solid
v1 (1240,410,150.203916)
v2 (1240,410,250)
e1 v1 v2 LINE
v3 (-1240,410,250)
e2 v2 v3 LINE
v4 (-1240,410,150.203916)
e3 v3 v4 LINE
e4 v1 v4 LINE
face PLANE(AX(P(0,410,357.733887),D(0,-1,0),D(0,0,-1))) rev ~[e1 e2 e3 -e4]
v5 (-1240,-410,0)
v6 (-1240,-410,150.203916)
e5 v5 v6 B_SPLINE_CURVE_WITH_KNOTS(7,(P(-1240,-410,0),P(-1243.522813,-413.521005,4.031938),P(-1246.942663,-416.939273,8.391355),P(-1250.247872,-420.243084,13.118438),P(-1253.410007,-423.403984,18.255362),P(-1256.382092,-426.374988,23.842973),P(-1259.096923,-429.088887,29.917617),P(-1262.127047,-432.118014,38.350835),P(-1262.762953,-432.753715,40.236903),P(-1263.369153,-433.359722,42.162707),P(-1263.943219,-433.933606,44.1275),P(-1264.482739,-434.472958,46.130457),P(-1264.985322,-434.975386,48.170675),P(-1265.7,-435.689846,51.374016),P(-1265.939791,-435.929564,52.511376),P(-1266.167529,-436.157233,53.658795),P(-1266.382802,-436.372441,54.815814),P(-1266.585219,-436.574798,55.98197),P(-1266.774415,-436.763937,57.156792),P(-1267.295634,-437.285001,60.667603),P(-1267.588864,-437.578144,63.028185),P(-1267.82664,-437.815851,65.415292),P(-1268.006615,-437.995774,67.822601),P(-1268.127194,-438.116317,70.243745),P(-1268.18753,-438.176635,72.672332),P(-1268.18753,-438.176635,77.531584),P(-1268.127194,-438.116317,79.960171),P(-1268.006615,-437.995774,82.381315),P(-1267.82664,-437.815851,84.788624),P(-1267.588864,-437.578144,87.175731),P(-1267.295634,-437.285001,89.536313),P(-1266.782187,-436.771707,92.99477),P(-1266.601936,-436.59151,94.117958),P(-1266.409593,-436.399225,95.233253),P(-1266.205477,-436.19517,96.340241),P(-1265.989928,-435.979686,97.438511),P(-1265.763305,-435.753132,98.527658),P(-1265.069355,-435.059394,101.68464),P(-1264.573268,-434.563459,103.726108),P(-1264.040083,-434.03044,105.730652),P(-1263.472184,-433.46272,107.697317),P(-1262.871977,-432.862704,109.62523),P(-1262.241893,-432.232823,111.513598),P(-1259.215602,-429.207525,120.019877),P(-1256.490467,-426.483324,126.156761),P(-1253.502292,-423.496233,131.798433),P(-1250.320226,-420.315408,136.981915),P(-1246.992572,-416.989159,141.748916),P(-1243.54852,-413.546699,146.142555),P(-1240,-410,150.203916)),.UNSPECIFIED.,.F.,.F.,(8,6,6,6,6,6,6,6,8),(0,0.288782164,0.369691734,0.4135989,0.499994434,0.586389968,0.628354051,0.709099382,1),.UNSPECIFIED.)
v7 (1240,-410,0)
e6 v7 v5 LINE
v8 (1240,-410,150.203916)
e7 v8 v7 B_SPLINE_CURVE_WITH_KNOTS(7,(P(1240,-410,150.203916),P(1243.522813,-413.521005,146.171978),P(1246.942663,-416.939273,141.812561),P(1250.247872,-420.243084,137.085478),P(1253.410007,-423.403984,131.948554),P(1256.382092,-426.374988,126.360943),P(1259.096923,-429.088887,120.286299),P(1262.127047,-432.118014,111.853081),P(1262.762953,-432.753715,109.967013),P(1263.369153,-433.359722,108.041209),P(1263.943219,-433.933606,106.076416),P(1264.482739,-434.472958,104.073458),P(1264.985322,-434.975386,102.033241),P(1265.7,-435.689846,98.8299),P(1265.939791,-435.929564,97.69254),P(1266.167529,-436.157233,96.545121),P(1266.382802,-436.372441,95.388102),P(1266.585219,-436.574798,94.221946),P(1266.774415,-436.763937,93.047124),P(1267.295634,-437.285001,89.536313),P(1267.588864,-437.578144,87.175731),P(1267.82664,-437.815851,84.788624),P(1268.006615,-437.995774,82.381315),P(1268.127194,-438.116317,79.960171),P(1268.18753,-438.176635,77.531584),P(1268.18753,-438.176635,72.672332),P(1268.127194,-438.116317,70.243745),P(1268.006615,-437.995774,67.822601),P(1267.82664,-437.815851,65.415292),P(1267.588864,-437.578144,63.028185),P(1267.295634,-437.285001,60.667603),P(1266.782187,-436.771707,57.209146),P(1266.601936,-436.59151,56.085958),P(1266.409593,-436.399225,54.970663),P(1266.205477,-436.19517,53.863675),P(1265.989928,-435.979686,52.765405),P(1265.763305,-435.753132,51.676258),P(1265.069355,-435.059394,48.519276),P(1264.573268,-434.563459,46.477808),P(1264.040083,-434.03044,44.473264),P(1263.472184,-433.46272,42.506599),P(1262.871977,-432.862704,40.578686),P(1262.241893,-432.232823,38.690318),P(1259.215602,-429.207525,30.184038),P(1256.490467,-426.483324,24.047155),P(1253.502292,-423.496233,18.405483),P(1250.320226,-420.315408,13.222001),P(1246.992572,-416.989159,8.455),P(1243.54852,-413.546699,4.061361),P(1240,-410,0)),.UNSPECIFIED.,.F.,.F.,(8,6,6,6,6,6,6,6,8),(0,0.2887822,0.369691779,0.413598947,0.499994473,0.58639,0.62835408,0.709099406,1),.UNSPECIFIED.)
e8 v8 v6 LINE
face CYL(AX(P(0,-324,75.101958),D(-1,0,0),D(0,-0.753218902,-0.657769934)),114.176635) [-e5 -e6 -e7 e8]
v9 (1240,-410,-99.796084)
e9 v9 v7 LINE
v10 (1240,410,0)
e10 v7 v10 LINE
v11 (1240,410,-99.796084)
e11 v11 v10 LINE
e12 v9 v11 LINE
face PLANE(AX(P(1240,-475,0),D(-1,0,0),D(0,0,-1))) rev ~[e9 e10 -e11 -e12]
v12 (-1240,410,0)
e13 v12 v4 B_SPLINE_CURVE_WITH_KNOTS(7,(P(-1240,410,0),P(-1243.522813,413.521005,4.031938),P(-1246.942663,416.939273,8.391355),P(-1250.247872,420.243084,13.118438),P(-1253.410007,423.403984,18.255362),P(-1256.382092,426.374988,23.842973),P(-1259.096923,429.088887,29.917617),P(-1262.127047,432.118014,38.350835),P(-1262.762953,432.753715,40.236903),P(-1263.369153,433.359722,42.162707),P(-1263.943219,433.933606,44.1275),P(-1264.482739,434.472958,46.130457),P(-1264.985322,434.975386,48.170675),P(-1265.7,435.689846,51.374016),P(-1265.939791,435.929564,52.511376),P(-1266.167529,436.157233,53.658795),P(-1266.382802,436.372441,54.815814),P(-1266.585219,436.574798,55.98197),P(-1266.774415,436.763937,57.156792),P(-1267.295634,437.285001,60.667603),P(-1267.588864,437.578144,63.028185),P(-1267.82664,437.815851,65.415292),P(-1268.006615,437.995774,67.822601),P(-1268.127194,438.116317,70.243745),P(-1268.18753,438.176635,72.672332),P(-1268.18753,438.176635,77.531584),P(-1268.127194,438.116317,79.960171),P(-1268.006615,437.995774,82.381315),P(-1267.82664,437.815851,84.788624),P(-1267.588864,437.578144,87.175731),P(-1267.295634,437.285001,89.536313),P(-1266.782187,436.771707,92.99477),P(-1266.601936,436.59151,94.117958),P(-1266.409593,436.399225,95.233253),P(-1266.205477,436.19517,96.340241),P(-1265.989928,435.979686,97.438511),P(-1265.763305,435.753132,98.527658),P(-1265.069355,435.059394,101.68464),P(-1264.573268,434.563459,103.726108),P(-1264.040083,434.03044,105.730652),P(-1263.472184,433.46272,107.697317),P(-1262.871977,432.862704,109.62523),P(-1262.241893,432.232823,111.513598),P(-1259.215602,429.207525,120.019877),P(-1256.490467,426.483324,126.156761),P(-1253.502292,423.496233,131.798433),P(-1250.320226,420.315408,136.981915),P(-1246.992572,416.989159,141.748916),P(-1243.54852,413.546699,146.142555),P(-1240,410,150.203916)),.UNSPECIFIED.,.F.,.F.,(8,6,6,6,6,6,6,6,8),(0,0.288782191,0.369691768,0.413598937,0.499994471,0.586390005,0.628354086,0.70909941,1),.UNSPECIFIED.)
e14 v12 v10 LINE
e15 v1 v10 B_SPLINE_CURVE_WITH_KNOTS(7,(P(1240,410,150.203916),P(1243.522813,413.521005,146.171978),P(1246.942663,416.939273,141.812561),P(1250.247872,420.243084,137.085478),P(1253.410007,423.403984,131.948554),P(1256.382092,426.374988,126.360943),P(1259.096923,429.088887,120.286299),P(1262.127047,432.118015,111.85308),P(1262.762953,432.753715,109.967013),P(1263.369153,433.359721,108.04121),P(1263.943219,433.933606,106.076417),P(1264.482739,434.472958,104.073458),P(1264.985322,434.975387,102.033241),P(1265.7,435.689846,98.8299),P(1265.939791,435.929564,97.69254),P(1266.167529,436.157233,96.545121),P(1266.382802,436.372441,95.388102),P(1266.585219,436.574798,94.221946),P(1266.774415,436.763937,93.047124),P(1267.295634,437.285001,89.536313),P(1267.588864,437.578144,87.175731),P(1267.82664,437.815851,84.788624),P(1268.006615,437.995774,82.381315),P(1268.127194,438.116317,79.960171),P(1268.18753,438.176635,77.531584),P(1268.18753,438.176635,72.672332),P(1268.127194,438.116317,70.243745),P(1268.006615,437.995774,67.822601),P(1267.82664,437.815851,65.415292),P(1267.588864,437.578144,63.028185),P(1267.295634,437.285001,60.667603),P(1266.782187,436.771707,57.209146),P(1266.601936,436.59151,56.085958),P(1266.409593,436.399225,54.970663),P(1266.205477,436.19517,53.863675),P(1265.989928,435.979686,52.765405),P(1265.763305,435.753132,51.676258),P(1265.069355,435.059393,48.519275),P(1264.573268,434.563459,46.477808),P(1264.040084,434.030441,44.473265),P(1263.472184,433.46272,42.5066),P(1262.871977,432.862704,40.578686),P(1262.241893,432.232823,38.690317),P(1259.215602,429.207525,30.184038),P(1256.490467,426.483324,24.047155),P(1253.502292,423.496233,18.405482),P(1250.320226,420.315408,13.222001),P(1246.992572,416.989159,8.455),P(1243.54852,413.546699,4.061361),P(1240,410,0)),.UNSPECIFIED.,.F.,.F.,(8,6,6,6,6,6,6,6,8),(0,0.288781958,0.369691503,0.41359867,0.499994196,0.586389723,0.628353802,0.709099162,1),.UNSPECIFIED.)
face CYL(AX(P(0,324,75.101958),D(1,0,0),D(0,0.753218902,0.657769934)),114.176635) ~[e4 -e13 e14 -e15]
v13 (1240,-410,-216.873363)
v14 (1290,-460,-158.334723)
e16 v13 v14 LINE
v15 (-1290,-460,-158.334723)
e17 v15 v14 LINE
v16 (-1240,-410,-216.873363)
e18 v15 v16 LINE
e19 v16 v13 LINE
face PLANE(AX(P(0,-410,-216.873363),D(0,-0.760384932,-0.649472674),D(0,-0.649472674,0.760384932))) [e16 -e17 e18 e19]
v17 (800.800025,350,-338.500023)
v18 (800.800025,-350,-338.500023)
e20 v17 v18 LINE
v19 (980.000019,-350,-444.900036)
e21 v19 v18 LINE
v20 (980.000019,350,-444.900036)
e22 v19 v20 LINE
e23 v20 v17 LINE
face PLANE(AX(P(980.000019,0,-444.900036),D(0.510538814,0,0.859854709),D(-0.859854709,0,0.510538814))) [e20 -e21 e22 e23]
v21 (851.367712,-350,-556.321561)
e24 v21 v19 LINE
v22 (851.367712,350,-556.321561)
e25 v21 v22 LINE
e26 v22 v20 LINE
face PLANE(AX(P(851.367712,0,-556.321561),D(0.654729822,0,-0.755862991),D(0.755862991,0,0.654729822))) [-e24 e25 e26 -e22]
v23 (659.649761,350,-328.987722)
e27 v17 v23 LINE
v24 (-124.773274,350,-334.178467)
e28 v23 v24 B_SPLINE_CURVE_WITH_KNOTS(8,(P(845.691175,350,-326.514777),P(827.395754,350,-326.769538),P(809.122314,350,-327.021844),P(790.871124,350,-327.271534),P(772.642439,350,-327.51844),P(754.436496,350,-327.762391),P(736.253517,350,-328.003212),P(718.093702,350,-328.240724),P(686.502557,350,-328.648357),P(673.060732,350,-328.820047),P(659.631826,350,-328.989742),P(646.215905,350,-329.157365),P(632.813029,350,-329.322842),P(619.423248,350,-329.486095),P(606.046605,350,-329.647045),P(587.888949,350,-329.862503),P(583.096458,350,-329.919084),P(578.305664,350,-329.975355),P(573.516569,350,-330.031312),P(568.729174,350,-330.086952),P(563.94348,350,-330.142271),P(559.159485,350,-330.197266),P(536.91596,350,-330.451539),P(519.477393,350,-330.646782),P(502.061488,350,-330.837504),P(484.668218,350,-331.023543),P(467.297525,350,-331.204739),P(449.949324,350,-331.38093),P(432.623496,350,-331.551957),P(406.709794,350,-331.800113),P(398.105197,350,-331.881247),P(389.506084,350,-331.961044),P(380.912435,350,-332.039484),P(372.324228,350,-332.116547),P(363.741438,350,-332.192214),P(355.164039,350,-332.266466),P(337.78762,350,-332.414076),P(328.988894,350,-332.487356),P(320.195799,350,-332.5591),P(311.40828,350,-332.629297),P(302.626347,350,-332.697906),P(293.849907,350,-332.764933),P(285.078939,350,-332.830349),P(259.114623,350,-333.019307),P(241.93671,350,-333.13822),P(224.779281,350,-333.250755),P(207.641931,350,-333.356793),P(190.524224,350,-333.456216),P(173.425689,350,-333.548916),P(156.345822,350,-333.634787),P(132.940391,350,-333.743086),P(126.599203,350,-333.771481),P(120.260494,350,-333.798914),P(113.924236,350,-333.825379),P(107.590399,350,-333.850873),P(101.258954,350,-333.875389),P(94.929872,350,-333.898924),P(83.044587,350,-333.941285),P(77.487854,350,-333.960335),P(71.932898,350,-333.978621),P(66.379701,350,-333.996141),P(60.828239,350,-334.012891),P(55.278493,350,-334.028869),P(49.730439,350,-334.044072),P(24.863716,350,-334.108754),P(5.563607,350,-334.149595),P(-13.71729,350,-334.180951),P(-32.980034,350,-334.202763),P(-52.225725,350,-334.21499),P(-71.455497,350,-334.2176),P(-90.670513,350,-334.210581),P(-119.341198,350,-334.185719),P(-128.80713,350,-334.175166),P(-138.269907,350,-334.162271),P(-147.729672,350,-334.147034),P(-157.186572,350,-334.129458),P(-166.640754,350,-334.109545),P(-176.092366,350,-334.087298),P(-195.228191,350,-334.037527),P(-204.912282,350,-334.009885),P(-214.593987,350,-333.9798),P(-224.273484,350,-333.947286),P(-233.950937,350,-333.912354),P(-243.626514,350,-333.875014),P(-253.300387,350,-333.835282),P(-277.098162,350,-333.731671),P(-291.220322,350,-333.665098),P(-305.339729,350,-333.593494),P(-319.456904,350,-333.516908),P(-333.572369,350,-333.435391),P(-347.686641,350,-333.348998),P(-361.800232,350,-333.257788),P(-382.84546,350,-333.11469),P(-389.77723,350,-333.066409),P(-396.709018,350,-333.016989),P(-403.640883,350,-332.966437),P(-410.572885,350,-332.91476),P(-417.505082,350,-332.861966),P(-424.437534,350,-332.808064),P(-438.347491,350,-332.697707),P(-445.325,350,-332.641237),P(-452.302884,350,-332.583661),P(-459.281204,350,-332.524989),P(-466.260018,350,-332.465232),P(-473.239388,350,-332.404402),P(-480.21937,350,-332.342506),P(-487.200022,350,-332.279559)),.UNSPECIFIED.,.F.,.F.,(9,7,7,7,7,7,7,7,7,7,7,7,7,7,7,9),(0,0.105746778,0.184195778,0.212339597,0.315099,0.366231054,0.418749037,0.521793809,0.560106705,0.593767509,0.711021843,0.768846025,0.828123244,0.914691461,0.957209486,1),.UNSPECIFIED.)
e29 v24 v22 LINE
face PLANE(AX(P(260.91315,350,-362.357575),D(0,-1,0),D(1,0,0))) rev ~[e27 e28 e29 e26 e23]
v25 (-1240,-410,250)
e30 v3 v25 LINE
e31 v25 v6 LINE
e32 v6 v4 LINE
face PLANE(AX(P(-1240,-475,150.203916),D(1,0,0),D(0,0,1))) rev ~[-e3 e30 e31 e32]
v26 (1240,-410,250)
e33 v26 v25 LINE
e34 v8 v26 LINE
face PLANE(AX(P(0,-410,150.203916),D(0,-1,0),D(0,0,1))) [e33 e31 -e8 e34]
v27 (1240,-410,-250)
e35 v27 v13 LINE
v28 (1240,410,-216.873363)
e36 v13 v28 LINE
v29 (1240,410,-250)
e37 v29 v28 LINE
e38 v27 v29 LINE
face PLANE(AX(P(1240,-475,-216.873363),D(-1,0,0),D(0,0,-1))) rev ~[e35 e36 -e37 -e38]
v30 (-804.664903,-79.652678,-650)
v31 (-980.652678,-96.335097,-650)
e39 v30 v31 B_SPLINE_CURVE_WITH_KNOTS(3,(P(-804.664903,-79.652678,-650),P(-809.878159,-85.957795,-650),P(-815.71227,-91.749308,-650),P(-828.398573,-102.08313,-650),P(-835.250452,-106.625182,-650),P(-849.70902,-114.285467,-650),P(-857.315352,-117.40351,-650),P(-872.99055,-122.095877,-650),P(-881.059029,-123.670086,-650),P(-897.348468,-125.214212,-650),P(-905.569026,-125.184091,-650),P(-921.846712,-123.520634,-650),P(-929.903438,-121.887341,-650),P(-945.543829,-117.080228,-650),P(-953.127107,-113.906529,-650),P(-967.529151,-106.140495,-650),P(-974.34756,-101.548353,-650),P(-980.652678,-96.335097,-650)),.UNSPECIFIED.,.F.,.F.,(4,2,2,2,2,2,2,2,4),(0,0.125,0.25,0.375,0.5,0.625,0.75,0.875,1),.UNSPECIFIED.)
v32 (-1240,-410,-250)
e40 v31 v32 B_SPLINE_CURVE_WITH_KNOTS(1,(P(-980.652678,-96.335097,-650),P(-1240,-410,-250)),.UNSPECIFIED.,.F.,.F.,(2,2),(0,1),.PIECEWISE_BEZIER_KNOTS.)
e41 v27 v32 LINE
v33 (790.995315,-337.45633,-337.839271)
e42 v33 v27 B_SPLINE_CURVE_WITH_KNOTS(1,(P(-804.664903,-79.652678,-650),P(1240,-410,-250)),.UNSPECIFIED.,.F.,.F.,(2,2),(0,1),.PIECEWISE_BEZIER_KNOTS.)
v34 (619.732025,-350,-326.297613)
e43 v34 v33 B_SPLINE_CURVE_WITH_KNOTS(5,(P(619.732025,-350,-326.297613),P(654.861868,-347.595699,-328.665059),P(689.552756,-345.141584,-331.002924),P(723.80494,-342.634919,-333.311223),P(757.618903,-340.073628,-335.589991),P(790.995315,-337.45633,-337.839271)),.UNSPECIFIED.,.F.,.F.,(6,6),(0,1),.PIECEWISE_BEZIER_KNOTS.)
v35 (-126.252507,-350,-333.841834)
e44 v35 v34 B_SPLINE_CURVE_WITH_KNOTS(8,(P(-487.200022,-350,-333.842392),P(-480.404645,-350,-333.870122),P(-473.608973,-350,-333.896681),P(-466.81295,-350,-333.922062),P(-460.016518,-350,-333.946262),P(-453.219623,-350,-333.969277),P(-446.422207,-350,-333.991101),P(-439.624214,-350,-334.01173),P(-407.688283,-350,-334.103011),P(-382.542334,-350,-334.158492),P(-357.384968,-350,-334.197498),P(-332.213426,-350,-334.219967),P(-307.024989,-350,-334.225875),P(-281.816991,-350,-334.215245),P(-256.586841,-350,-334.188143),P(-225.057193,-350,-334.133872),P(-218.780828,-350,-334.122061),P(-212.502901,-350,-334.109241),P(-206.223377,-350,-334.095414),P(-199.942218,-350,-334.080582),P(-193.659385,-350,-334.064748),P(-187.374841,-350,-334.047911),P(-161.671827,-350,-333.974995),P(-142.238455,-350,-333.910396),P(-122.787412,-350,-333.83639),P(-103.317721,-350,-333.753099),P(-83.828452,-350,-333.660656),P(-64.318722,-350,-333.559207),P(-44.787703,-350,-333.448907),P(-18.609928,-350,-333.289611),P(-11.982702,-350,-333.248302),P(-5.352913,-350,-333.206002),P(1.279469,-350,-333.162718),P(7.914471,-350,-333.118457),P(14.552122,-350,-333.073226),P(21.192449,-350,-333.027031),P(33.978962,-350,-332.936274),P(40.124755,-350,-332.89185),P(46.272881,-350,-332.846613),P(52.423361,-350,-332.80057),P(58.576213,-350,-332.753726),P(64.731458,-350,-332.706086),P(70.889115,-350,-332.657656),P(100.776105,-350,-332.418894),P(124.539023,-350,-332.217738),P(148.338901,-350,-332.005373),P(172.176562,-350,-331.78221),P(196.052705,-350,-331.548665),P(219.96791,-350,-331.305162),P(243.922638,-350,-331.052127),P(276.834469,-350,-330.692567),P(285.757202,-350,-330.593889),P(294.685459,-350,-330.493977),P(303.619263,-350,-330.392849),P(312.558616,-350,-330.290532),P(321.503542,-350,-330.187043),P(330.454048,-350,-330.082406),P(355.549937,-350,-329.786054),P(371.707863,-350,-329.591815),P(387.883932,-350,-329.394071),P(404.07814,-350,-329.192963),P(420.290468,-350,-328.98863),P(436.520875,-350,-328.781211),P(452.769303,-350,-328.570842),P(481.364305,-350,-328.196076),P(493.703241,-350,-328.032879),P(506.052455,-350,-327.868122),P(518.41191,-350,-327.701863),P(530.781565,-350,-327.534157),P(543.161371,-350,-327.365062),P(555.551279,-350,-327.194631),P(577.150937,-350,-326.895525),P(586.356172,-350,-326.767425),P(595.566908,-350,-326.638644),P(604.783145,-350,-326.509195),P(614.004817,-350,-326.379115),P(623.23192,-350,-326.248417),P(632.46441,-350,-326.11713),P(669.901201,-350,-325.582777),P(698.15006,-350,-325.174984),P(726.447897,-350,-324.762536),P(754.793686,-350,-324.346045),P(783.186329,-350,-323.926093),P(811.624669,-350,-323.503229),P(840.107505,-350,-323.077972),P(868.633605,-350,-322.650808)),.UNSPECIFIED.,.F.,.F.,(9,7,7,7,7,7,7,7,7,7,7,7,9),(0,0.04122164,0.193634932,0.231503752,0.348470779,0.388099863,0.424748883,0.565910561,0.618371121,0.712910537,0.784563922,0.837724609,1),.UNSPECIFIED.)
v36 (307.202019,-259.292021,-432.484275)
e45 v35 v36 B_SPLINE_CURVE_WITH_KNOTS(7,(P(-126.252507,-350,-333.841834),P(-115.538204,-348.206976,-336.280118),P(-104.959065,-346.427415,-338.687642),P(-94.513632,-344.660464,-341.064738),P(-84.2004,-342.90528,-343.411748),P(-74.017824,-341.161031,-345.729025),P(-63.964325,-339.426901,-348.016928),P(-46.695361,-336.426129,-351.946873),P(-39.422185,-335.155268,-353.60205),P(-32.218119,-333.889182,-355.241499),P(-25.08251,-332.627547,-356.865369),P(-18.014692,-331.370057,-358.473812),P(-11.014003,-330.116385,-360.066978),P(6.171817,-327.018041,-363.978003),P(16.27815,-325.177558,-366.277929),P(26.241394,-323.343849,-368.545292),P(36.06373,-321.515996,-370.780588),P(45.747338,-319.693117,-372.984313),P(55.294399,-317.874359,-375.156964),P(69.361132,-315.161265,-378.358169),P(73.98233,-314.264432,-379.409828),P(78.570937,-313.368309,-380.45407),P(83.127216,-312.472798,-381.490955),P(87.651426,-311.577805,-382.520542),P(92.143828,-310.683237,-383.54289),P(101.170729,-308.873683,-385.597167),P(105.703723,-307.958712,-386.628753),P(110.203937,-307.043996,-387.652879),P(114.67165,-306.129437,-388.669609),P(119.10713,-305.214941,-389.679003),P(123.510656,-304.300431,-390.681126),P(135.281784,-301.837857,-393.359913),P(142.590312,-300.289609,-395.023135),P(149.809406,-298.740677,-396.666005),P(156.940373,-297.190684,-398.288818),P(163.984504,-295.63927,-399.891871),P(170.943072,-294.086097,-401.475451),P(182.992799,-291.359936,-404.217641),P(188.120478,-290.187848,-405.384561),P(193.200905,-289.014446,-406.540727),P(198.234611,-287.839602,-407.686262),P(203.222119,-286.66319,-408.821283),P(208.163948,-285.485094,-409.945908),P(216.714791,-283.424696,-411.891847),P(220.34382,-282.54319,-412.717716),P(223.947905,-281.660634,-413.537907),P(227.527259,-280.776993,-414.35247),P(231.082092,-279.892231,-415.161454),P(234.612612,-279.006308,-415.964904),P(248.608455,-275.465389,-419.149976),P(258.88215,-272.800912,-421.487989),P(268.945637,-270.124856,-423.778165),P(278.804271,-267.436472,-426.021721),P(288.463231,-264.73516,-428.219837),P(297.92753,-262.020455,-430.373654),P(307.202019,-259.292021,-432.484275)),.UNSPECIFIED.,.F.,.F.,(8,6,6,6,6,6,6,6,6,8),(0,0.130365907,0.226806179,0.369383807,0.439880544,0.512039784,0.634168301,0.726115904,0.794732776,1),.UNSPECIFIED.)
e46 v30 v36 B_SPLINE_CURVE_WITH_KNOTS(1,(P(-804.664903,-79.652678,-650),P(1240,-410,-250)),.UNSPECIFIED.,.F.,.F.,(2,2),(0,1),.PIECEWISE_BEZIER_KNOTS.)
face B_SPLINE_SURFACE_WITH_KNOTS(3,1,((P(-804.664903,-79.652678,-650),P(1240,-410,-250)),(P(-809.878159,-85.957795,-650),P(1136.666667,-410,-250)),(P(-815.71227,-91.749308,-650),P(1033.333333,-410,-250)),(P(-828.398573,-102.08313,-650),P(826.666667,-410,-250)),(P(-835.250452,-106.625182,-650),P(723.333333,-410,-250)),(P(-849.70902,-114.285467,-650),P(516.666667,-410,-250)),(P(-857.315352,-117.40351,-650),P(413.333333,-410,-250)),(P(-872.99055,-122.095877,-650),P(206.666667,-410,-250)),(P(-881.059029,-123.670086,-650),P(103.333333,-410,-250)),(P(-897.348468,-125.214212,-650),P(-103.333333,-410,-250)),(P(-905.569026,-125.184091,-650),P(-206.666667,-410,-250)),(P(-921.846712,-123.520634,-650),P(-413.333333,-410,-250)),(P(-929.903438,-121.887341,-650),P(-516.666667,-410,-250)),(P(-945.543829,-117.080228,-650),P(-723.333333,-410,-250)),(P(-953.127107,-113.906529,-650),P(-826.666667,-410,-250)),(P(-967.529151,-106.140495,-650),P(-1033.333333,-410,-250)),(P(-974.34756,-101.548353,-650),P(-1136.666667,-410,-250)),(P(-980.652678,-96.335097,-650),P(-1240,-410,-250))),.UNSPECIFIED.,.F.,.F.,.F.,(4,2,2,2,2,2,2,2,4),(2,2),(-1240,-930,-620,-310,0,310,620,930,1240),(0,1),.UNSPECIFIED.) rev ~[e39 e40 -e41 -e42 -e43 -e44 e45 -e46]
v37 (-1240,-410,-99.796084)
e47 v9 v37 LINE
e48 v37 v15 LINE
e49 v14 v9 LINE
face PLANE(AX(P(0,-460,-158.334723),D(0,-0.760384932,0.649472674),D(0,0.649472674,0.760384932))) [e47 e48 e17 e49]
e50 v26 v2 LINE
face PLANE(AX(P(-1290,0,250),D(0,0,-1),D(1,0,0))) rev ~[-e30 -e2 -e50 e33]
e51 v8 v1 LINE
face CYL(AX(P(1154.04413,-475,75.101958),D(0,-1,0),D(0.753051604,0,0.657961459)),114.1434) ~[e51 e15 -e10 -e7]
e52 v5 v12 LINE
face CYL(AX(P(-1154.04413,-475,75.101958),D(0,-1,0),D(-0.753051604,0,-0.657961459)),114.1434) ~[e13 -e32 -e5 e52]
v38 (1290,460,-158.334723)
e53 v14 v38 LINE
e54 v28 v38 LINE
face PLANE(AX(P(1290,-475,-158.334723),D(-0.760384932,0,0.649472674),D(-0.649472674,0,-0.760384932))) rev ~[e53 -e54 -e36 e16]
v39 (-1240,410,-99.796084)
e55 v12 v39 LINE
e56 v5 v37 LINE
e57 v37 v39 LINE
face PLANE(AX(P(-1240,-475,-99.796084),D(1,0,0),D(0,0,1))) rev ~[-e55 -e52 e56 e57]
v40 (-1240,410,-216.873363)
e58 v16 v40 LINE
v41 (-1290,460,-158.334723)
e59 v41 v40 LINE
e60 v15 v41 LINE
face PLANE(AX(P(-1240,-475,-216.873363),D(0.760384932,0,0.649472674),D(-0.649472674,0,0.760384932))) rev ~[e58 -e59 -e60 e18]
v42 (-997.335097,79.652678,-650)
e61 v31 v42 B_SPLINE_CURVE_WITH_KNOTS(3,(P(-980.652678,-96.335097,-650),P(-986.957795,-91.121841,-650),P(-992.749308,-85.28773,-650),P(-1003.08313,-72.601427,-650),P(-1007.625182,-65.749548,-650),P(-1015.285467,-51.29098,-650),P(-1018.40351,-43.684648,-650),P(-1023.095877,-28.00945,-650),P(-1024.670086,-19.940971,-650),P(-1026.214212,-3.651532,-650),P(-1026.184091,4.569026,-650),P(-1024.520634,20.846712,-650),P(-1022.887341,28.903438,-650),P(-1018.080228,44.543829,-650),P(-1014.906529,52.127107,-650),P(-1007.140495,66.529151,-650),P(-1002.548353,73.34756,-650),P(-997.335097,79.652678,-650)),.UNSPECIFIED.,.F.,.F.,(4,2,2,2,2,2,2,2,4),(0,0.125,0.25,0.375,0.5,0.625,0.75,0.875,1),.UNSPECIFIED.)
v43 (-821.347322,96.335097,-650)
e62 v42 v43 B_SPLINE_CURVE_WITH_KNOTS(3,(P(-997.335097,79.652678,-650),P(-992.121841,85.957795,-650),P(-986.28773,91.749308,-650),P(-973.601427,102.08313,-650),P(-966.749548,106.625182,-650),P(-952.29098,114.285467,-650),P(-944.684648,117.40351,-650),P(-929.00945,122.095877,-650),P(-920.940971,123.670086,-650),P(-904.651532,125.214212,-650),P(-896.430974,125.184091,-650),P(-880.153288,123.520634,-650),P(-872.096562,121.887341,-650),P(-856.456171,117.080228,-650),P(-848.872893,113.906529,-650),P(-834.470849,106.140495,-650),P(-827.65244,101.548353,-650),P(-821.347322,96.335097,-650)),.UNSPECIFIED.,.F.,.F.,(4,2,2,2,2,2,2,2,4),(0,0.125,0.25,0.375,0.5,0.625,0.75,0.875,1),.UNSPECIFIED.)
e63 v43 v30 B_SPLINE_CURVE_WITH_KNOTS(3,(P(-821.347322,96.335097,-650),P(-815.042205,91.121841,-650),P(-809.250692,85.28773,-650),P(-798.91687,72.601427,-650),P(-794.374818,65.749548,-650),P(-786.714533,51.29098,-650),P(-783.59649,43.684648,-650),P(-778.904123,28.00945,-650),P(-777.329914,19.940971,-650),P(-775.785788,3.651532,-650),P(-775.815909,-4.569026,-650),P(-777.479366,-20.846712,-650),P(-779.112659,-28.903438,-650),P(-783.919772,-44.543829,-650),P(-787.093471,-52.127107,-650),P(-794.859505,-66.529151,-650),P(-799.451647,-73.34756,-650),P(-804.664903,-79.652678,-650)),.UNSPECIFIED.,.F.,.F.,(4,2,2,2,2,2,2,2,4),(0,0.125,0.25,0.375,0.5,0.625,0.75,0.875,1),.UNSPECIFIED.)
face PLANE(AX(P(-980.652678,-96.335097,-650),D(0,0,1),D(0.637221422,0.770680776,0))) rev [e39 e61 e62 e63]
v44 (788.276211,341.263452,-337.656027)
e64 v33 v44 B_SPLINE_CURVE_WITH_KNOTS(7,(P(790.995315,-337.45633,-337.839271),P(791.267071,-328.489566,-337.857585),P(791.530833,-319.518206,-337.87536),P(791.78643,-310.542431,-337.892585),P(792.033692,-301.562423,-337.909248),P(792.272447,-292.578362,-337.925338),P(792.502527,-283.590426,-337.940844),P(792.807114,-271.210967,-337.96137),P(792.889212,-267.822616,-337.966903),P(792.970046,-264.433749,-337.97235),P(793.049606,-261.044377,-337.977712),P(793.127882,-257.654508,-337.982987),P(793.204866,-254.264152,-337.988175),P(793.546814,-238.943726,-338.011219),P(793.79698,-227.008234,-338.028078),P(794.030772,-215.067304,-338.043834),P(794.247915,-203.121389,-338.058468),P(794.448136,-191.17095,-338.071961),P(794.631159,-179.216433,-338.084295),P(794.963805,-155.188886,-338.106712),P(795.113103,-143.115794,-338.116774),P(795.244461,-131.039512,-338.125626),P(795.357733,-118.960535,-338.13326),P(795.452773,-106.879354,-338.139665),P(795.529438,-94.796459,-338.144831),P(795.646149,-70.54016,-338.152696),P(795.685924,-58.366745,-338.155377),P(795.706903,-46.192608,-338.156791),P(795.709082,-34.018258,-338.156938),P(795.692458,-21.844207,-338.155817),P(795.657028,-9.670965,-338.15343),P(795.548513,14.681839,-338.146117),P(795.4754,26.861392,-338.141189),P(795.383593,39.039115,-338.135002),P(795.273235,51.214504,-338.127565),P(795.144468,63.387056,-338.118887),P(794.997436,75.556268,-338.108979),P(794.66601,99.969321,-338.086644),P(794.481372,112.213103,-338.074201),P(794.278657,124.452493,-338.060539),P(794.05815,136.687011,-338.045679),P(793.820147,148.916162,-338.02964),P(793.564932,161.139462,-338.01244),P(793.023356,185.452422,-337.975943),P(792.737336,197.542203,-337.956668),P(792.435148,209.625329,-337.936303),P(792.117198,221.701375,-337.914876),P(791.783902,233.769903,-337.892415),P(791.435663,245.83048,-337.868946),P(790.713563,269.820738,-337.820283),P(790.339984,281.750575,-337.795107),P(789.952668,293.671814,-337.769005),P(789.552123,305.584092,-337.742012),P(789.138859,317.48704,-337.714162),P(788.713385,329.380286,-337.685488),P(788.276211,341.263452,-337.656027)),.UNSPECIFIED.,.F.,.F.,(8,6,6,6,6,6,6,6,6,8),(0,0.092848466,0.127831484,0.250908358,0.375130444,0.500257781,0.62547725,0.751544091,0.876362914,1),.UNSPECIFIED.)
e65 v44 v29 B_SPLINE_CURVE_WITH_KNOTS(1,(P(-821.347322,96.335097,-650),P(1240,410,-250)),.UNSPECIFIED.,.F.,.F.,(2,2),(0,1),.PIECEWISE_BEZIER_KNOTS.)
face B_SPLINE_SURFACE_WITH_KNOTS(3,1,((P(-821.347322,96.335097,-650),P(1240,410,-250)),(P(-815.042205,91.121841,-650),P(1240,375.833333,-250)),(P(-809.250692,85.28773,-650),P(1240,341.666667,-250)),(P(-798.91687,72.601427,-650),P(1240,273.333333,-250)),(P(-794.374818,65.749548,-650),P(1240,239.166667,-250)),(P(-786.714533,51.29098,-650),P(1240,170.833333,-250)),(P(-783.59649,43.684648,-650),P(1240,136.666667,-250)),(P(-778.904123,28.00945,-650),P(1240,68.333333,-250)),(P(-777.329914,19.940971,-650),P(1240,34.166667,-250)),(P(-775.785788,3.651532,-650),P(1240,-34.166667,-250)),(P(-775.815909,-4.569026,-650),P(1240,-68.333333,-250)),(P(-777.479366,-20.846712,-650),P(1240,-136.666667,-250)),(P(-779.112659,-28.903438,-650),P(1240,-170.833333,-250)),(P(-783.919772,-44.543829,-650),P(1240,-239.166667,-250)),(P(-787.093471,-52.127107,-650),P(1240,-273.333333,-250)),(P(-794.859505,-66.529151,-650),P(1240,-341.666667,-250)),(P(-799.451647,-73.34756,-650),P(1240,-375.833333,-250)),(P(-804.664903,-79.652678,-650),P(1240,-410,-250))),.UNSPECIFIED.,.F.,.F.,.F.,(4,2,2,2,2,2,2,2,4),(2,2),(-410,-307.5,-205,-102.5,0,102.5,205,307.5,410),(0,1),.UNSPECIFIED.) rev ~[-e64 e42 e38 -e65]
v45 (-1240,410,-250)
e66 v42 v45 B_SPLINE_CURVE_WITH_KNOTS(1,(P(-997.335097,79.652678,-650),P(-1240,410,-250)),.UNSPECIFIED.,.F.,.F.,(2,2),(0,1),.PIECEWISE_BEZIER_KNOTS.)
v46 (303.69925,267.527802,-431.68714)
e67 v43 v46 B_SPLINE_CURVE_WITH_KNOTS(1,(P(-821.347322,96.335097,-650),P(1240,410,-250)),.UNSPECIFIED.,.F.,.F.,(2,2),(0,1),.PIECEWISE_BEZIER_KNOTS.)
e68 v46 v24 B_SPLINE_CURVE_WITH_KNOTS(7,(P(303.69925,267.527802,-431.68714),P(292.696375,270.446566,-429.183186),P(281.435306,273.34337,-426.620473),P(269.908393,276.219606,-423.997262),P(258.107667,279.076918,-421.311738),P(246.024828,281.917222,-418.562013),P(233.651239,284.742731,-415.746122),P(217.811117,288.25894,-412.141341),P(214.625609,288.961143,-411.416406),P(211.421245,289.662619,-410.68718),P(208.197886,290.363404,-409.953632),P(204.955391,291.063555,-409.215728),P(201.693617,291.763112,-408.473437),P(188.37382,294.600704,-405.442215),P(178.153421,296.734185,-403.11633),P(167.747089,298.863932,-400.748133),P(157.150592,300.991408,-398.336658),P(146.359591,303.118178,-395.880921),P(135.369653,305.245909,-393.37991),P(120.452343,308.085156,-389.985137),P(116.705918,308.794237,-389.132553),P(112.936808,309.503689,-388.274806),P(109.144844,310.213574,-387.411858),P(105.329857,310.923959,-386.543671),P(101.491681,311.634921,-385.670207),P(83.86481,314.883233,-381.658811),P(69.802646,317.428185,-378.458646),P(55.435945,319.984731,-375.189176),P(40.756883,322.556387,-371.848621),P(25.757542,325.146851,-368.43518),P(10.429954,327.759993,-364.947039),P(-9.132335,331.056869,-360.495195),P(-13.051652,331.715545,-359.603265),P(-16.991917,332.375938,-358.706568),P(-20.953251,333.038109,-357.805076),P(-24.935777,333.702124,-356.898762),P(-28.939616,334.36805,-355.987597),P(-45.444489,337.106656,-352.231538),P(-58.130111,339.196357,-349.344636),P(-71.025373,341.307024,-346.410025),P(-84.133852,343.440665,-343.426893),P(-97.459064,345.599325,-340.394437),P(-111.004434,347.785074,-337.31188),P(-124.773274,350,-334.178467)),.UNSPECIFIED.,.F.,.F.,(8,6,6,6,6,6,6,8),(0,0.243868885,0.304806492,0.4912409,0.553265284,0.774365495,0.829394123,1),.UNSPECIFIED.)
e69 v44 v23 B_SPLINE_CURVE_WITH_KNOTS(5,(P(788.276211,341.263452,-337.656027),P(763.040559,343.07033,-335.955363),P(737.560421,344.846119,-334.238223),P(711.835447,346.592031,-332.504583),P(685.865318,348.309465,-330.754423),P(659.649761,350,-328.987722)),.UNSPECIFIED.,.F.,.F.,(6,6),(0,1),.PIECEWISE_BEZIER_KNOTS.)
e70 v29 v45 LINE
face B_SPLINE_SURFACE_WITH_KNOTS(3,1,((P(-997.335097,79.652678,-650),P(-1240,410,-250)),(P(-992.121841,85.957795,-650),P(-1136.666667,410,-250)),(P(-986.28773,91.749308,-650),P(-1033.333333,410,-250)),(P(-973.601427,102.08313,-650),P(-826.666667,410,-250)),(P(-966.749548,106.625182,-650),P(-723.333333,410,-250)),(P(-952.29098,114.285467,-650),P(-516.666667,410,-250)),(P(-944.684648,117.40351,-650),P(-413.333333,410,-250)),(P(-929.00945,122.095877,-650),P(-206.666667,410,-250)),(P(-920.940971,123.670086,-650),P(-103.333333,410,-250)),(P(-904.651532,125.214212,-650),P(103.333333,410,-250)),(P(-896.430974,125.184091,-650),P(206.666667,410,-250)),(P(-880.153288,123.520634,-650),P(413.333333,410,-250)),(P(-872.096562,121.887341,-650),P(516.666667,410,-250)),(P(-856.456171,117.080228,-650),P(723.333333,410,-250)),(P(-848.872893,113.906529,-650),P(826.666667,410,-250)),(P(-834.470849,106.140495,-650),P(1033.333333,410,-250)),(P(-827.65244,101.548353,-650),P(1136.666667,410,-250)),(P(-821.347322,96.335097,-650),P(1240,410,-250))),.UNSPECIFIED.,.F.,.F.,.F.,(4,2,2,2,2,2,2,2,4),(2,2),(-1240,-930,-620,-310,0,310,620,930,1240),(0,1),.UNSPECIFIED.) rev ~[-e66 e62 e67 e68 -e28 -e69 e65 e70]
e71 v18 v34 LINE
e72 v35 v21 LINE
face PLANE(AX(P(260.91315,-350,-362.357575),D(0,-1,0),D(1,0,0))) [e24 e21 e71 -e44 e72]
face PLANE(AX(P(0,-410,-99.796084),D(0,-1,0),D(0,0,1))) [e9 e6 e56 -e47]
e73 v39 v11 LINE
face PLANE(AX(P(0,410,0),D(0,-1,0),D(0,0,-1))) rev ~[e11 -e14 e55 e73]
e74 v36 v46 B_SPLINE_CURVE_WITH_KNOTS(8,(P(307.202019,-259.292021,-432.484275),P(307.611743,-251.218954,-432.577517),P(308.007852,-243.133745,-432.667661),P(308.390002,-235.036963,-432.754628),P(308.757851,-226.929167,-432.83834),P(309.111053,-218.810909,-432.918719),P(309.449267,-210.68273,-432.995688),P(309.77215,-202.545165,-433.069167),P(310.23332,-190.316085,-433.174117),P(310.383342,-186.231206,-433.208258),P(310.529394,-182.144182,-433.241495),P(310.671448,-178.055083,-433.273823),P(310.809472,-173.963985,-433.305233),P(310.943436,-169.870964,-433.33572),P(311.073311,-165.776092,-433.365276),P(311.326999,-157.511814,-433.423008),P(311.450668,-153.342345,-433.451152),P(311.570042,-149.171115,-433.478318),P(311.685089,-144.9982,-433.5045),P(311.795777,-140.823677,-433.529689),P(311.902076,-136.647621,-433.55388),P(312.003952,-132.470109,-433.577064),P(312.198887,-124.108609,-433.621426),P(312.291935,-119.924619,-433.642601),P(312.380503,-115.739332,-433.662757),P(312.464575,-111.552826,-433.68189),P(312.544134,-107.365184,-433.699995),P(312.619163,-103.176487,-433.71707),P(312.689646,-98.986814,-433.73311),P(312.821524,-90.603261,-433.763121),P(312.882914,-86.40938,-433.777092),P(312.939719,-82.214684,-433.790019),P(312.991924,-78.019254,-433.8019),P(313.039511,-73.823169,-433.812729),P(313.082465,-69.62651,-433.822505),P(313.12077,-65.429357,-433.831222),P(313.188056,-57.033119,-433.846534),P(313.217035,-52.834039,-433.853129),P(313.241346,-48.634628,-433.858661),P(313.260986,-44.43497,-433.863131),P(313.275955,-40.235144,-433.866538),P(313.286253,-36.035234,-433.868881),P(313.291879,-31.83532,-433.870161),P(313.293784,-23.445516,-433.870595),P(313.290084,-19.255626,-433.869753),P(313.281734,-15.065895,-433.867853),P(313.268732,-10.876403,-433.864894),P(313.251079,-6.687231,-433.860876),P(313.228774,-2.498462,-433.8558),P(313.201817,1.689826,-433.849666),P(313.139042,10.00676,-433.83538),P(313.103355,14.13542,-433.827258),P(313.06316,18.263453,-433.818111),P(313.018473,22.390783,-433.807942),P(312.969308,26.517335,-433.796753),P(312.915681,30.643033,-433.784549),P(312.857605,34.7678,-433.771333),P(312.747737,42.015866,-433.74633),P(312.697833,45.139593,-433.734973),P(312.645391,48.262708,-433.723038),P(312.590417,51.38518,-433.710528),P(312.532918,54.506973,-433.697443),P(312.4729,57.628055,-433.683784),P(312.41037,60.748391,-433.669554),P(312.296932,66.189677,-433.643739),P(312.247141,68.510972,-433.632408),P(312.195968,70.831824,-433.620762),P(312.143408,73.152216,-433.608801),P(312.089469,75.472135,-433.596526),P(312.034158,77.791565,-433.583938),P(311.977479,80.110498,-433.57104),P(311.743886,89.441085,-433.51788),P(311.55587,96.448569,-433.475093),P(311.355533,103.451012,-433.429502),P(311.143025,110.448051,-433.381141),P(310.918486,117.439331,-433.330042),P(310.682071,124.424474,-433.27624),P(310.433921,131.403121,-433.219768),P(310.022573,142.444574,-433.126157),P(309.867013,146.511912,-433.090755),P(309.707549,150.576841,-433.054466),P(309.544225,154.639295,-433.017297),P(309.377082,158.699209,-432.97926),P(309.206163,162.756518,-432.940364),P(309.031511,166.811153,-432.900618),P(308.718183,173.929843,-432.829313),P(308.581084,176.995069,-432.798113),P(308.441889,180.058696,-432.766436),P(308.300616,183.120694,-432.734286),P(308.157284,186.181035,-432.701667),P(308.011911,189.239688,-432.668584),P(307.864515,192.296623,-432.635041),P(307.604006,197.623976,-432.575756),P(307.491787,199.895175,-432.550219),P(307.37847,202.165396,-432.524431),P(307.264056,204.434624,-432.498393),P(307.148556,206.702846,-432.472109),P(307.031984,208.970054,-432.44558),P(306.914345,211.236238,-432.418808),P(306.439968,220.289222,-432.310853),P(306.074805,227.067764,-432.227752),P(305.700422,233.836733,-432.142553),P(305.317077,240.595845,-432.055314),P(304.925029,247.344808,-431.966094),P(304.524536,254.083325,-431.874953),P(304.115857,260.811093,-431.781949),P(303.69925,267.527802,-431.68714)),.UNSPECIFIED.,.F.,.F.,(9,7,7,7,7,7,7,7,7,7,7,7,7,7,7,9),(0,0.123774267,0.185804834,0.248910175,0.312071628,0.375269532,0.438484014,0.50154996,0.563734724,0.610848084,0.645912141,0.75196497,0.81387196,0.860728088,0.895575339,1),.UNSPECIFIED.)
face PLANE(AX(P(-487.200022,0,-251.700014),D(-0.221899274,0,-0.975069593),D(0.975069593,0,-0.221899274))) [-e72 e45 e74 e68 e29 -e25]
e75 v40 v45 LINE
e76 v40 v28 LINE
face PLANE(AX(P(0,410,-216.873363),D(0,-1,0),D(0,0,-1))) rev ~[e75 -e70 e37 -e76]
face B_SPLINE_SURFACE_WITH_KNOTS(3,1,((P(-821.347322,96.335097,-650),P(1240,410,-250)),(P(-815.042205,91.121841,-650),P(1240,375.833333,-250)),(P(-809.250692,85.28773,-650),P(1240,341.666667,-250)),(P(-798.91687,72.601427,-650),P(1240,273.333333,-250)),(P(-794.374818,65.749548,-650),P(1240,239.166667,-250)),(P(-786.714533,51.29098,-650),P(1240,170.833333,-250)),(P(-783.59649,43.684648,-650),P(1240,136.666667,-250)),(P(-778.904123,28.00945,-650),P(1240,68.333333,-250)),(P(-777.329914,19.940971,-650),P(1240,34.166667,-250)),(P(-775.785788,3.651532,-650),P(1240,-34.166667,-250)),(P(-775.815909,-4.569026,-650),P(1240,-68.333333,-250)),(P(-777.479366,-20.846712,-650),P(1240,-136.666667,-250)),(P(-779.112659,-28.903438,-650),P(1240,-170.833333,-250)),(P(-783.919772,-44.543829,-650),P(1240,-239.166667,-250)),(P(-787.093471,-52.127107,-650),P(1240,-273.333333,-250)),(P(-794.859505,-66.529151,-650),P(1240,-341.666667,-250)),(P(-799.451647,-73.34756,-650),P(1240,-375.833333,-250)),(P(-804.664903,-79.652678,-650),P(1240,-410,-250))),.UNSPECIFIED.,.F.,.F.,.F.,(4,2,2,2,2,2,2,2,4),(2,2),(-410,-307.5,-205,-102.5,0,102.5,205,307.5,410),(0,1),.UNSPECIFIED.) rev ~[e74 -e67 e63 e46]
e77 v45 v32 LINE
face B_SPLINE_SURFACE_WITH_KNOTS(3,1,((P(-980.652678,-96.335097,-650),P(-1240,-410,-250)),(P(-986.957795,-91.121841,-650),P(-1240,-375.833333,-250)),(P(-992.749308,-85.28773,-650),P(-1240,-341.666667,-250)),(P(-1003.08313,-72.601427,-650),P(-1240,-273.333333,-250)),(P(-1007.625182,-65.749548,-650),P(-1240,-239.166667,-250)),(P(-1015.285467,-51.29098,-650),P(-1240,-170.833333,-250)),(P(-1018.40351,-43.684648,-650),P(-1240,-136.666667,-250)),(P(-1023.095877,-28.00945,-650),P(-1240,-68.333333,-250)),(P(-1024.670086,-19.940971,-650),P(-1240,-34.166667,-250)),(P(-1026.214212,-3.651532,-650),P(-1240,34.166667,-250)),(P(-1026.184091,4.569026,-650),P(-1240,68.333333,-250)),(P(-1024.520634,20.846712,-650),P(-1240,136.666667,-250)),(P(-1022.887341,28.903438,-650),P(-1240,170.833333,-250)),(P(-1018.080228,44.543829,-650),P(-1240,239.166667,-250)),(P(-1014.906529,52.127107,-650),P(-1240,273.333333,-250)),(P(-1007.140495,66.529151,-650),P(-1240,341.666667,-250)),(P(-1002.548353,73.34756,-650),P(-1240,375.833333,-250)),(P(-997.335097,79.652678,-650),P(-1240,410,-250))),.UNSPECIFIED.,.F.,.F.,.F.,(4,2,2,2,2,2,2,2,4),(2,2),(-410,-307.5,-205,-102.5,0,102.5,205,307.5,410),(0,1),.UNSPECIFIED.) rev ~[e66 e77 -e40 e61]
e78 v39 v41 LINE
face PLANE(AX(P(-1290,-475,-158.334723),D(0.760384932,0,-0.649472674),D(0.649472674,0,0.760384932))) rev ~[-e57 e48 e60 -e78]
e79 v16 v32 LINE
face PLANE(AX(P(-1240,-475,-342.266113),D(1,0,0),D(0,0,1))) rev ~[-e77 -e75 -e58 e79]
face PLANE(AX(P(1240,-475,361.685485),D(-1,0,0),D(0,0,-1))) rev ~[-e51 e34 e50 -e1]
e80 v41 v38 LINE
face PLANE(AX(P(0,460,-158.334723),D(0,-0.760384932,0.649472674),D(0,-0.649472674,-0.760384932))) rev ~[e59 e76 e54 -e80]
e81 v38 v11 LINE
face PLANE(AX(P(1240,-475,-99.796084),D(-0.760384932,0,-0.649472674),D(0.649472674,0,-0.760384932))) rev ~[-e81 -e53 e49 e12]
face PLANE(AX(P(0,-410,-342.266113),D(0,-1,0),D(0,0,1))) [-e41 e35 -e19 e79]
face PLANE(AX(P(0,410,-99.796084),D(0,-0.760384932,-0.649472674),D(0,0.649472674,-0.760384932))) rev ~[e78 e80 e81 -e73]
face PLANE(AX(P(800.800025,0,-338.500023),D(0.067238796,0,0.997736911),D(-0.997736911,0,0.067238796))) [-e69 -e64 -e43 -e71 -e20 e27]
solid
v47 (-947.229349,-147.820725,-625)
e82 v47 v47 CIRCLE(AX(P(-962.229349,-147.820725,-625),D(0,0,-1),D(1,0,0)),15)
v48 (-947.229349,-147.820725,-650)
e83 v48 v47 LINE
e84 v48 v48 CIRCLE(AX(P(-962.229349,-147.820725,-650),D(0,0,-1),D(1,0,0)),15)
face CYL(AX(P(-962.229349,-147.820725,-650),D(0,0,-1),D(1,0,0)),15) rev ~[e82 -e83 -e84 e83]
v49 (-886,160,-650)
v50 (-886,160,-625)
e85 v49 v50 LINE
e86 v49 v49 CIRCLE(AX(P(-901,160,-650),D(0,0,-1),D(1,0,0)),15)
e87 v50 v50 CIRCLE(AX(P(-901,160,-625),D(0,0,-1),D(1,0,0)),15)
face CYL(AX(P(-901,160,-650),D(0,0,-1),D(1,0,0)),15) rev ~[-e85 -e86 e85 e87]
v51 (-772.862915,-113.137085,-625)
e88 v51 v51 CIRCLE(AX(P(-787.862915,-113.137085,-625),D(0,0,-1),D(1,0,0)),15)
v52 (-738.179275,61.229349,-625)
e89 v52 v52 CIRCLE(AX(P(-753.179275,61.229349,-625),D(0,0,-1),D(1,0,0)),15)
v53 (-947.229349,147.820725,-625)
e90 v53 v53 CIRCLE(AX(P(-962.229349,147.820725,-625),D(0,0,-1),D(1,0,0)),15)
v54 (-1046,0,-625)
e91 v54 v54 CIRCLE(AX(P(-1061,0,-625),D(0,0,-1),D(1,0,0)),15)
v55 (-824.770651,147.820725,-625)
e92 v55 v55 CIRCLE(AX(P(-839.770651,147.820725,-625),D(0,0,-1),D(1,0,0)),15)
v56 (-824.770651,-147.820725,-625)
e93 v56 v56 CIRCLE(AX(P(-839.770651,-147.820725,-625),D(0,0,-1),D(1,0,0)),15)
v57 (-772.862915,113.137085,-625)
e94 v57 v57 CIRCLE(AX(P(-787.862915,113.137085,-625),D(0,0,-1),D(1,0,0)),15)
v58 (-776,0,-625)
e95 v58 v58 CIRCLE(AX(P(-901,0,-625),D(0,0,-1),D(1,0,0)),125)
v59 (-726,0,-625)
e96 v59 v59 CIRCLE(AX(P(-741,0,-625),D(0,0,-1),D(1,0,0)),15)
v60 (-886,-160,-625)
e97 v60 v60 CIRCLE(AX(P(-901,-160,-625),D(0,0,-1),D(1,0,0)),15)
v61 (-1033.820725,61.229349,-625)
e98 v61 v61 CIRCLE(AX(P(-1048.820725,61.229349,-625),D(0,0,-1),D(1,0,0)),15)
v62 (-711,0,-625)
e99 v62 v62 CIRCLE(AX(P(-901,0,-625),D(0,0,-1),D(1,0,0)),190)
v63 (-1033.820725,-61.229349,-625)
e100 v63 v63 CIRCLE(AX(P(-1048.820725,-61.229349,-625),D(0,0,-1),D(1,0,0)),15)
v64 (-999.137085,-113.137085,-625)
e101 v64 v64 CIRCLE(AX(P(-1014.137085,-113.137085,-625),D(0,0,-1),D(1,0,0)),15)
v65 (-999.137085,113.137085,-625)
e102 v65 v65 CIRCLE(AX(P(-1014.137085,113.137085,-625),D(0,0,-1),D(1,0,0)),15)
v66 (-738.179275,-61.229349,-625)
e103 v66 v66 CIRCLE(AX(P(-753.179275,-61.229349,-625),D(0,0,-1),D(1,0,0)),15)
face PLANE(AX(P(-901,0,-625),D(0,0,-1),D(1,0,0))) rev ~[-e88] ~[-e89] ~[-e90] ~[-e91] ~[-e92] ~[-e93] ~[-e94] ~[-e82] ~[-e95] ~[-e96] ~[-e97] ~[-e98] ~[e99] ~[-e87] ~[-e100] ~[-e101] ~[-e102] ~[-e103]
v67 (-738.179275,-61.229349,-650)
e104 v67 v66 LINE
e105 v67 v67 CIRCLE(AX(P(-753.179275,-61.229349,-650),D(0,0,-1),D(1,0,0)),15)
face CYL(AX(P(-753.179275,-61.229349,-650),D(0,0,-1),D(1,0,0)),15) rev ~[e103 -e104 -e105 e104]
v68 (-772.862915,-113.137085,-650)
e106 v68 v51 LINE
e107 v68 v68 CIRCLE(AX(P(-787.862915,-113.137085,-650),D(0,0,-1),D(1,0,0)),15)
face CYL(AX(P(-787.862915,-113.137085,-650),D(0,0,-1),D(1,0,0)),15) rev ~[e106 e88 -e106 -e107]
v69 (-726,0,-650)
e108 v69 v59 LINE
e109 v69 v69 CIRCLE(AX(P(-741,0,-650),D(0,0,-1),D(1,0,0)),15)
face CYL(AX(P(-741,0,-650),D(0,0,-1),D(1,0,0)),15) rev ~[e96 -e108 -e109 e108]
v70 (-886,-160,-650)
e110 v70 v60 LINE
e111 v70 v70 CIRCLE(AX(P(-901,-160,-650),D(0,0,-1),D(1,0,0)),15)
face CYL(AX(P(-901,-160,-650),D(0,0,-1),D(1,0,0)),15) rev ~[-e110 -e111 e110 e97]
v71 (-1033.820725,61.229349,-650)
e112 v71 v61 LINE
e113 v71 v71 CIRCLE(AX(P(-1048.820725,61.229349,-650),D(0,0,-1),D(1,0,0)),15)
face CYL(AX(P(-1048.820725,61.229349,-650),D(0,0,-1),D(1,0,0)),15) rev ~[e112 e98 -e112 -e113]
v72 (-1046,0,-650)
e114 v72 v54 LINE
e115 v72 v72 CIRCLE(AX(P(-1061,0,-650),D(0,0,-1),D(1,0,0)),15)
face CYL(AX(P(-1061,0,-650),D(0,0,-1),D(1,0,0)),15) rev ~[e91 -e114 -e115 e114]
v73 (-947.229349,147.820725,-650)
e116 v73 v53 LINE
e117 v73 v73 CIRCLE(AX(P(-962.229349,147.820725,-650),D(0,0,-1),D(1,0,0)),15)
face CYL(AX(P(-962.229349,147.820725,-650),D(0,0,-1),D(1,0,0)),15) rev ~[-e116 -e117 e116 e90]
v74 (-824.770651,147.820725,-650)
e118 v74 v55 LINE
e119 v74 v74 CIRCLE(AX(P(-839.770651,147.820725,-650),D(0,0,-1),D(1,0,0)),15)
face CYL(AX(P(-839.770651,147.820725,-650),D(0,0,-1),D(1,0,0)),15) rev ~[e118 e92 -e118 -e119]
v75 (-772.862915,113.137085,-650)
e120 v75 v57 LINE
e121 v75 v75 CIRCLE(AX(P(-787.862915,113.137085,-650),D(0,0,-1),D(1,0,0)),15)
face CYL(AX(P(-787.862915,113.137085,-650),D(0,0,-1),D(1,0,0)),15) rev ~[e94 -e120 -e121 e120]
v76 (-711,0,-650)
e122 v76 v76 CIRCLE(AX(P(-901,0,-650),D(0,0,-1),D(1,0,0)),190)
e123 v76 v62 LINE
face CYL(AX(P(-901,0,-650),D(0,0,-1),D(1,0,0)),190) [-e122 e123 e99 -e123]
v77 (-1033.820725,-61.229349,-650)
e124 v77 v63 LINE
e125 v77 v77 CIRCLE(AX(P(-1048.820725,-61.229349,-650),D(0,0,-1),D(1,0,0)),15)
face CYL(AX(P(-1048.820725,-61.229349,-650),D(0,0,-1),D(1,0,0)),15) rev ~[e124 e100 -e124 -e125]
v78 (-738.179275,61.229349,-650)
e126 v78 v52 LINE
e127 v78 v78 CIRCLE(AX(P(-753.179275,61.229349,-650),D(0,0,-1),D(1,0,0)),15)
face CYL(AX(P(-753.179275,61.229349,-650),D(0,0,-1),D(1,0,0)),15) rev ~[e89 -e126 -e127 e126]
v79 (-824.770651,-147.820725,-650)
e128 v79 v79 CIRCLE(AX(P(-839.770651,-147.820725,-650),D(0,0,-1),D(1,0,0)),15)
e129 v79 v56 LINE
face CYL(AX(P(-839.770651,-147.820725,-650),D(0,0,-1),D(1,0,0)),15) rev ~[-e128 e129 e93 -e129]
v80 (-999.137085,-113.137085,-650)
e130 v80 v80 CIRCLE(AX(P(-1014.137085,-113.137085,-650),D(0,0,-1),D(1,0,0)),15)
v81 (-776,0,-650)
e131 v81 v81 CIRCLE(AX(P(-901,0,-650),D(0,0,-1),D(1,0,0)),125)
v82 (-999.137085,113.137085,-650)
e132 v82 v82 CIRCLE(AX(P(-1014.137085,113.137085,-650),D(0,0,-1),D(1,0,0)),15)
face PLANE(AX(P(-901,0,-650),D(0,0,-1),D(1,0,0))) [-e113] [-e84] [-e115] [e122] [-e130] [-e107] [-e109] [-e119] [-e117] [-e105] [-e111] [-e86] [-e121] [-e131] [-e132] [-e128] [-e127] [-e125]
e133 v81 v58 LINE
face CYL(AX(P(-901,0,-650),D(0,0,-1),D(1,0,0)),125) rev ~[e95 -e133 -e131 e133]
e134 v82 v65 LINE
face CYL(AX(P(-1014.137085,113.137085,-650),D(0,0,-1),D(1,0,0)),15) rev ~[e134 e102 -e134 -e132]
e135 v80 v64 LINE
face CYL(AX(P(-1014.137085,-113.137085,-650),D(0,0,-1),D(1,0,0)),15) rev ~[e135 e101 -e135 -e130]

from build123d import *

# Parameters (mm, degrees)
F0_W       = 2580
F0_H       = 500
F1_DEPTH   = 475
F3_DEPTH   = 950
F5_DEPTH   = 2500
F1_FACE1_W = 2480
F1_FACE1_H = 820
F7_R       = 190
F7_R_2     = 15
F7_R_3     = 125
F9_DEPTH   = 25
F11_DEPTH  = 350


# Not quite as in the source:
# - the arcs of a loft's sections are written as splines that run evenly, so that the points pair up as in the source's solid


with BuildPart() as f1:
    # F0 (on Front) → F1 (new body, symmetric)
    with BuildSketch(Plane.XZ):
        Rectangle(F0_W, F0_H)
    extrude(amount=F1_DEPTH, both=True)

    # F2 (on face) → F3 (cut, through all)
    with BuildSketch(Plane.XZ.offset(475)):
        with BuildLine():
            Line((-1240, 150.2039159699), (-1240, 250))
            Line((-1240, 250), (-1240, 361.6854846478))
            Line((-1240, 361.6854846478), (-1458.3188199997, 361.6854846478))
            Line((-1458.3188199997, 361.6854846478), (-1458.3188199997, -342.266112566))
            Line((-1458.3188199997, -342.266112566), (-1240, -342.266112566))
            Line((-1240, -342.266112566), (-1240, -216.8733626604))
            Line((-1240, -216.8733626604), (-1290, -158.3347233453))
            Line((-1290, -158.3347233453), (-1240, -99.7960840301))
            Line((-1240, -99.7960840301), (-1240, 0))
            ThreePointArc((-1240, 0), (-1268.1875295389, 75.1019579849), (-1240, 150.2039159699))
        make_face()
        with BuildLine():
            ThreePointArc((1240, 150.2039159699), (1268.1875295389, 75.1019579849), (1240, 0))
            Line((1240, 0), (1240, -99.7960840301))
            Line((1240, -99.7960840301), (1290, -158.3347233453))
            Line((1290, -158.3347233453), (1240, -216.8733626604))
            Line((1240, -216.8733626604), (1240, -342.266112566))
            Line((1240, -342.266112566), (1458.3188199997, -342.266112566))
            Line((1458.3188199997, -342.266112566), (1458.3188199997, 361.6854846478))
            Line((1458.3188199997, 361.6854846478), (1240, 361.6854846478))
            Line((1240, 361.6854846478), (1240, 250))
            Line((1240, 250), (1240, 150.2039159699))
        make_face()
    extrude(amount=-F3_DEPTH, mode=Mode.SUBTRACT)

    # F4 (on Right) → F5 (cut, symmetric)
    with BuildSketch(Plane.YZ):
        with BuildLine():
            Line((-410, 150.2039159699), (-410, 250))
            Line((-410, 250), (-410, 357.733887434))
            Line((-410, 357.733887434), (-610, 357.733887434))
            Line((-610, 357.733887434), (-610, -342.266112566))
            Line((-610, -342.266112566), (-410, -342.266112566))
            Line((-410, -342.266112566), (-410, -216.8733626604))
            Line((-410, -216.8733626604), (-460, -158.3347233453))
            Line((-460, -158.3347233453), (-410, -99.7960840301))
            Line((-410, -99.7960840301), (-410, 0))
            ThreePointArc((-410, 0), (-438.1766354959, 75.1019579849), (-410, 150.2039159699))
        make_face()
        with BuildLine():
            ThreePointArc((410, 150.2039159699), (438.1766354959, 75.1019579849), (410, 0))
            Line((410, 0), (410, -99.7960840301))
            Line((410, -99.7960840301), (460, -158.3347233453))
            Line((460, -158.3347233453), (410, -216.8733626604))
            Line((410, -216.8733626604), (410, -342.266112566))
            Line((410, -342.266112566), (610, -342.266112566))
            Line((610, -342.266112566), (610, 357.733887434))
            Line((610, 357.733887434), (410, 357.733887434))
            Line((410, 357.733887434), (410, 250))
            Line((410, 250), (410, 150.2039159699))
        make_face()
    extrude(amount=F5_DEPTH, both=True, mode=Mode.SUBTRACT)

    # F7 (on offset) → F8 section 0
    with BuildSketch(Plane(origin=(0, 0, -650), x_dir=(1, 0, 0), z_dir=(0, 0, -1))):
        with BuildLine():
            add(Edge.make_bspline(
                [(-980.6526777918, 96.3350970343), (-986.9577951485, 91.1218414637), (-992.749308438, 85.2877302997), (-1003.0831296115, 72.6014268955), (-1007.6251819714, 65.749548349), (-1015.2854666523, 51.290980207), (-1018.4035095577, 43.6846481281), (-1023.0958773017, 28.0094499136), (-1024.6700861123, 19.9409713782), (-1026.2142118585, 3.6515321678), (-1026.1840906126, -4.5690257187), (-1024.5206344746, -20.8467119114), (-1022.8873407148, -28.9034377196), (-1018.080228379, -44.5438285428), (-1014.9065286684, -52.1271068182), (-1007.1404947661, -66.5291508238), (-1002.5483526049, -73.347560435), (-997.3350970343, -79.6526777918)],
                knots=[0, 0, 0, 0, 0.125, 0.125, 0.25, 0.25, 0.375, 0.375, 0.5, 0.5, 0.625, 0.625, 0.75, 0.75, 0.875, 0.875, 1, 1, 1, 1], degree=3))
            add(Edge.make_bspline(
                [(-997.3350970343, -79.6526777918), (-992.1218414637, -85.9577951485), (-986.2877302997, -91.749308438), (-973.6014268955, -102.0831296115), (-966.749548349, -106.6251819714), (-952.290980207, -114.2854666523), (-944.6846481281, -117.4035095577), (-929.0094499136, -122.0958773017), (-920.9409713782, -123.6700861123), (-904.6515321678, -125.2142118585), (-896.4309742813, -125.1840906126), (-880.1532880886, -123.5206344746), (-872.0965622804, -121.8873407148), (-856.4561714572, -117.080228379), (-848.8728931818, -113.9065286684), (-834.4708491762, -106.1404947661), (-827.652439565, -101.5483526049), (-821.3473222082, -96.3350970343)],
                knots=[0, 0, 0, 0, 0.125, 0.125, 0.25, 0.25, 0.375, 0.375, 0.5, 0.5, 0.625, 0.625, 0.75, 0.75, 0.875, 0.875, 1, 1, 1, 1], degree=3))
            add(Edge.make_bspline(
                [(-821.3473222082, -96.3350970343), (-815.0422048515, -91.1218414637), (-809.250691562, -85.2877302997), (-798.9168703885, -72.6014268955), (-794.3748180286, -65.749548349), (-786.7145333477, -51.290980207), (-783.5964904423, -43.6846481281), (-778.9041226983, -28.0094499136), (-777.3299138877, -19.9409713782), (-775.7857881415, -3.6515321678), (-775.8159093874, 4.5690257187), (-777.4793655254, 20.8467119114), (-779.1126592852, 28.9034377196), (-783.919771621, 44.5438285428), (-787.0934713316, 52.1271068182), (-794.8595052339, 66.5291508238), (-799.4516473951, 73.347560435), (-804.6649029657, 79.6526777918)],
                knots=[0, 0, 0, 0, 0.125, 0.125, 0.25, 0.25, 0.375, 0.375, 0.5, 0.5, 0.625, 0.625, 0.75, 0.75, 0.875, 0.875, 1, 1, 1, 1], degree=3))
            add(Edge.make_bspline(
                [(-804.6649029657, 79.6526777918), (-809.8781585363, 85.9577951485), (-815.7122697003, 91.749308438), (-828.3985731045, 102.0831296115), (-835.250451651, 106.6251819714), (-849.709019793, 114.2854666523), (-857.3153518719, 117.4035095577), (-872.9905500864, 122.0958773017), (-881.0590286218, 123.6700861123), (-897.3484678322, 125.2142118585), (-905.5690257187, 125.1840906126), (-921.8467119114, 123.5206344746), (-929.9034377196, 121.8873407148), (-945.5438285428, 117.080228379), (-953.1271068182, 113.9065286684), (-967.5291508238, 106.1404947661), (-974.347560435, 101.5483526049), (-980.6526777918, 96.3350970343)],
                knots=[0, 0, 0, 0, 0.125, 0.125, 0.25, 0.25, 0.375, 0.375, 0.5, 0.5, 0.625, 0.625, 0.75, 0.75, 0.875, 0.875, 1, 1, 1, 1], degree=3))
        make_face()
    # F1_face1 (on face) → F8 section 1
    with BuildSketch(Plane(origin=(0, 0, -250), x_dir=(1, 0, 0), z_dir=(0, 0, -1))):
        Rectangle(F1_FACE1_W, F1_FACE1_H)
    loft(ruled=True)

    # F10 (on Front) → F11 (join, symmetric)
    with BuildSketch(Plane.XZ):
        Polygon((980.0000190735, -444.9000358582), (800.8000254631, -338.5000228882), (-487.2000217438, -251.700013876), (851.3677120209, -556.3215613365), align=None)
    extrude(amount=F11_DEPTH, both=True)


with BuildPart() as f9:
    # F7 (on offset) → F9 (new body)
    with BuildSketch(Plane(origin=(0, 0, -650), x_dir=(1, 0, 0), z_dir=(0, 0, -1))):
        with Locations((-901, 0)):
            Circle(F7_R)
        with Locations((-1014.1370849898, -113.1370849898)):
            Circle(F7_R_2, mode=Mode.SUBTRACT)
        with Locations((-962.2293491784, -147.8207252018)):
            Circle(F7_R_2, mode=Mode.SUBTRACT)
        with Locations((-1048.8207252018, -61.2293491784)):
            Circle(F7_R_2, mode=Mode.SUBTRACT)
        with Locations((-901, -160)):
            Circle(F7_R_2, mode=Mode.SUBTRACT)
        with Locations((-839.7706508216, -147.8207252018)):
            Circle(F7_R_2, mode=Mode.SUBTRACT)
        with Locations((-787.8629150102, -113.1370849898)):
            Circle(F7_R_2, mode=Mode.SUBTRACT)
        with Locations((-753.1792747982, -61.2293491784)):
            Circle(F7_R_2, mode=Mode.SUBTRACT)
        with Locations((-1061, 0)):
            Circle(F7_R_2, mode=Mode.SUBTRACT)
        with Locations((-1048.8207252018, 61.2293491784)):
            Circle(F7_R_2, mode=Mode.SUBTRACT)
        with Locations((-1014.1370849898, 113.1370849898)):
            Circle(F7_R_2, mode=Mode.SUBTRACT)
        with Locations((-962.2293491784, 147.8207252018)):
            Circle(F7_R_2, mode=Mode.SUBTRACT)
        with Locations((-901, 0)):
            Circle(F7_R_3, mode=Mode.SUBTRACT)
        with Locations((-741, 0)):
            Circle(F7_R_2, mode=Mode.SUBTRACT)
        with Locations((-753.1792747982, 61.2293491784)):
            Circle(F7_R_2, mode=Mode.SUBTRACT)
        with Locations((-901, 160)):
            Circle(F7_R_2, mode=Mode.SUBTRACT)
        with Locations((-839.7706508216, 147.8207252018)):
            Circle(F7_R_2, mode=Mode.SUBTRACT)
        with Locations((-787.8629150102, 113.1370849898)):
            Circle(F7_R_2, mode=Mode.SUBTRACT)
    extrude(amount=-F9_DEPTH)


with BuildPart() as f12_1:
    # F12: copy of F9
    add(f9.part)


solid = Compound([f1.part, f12_1.part])
